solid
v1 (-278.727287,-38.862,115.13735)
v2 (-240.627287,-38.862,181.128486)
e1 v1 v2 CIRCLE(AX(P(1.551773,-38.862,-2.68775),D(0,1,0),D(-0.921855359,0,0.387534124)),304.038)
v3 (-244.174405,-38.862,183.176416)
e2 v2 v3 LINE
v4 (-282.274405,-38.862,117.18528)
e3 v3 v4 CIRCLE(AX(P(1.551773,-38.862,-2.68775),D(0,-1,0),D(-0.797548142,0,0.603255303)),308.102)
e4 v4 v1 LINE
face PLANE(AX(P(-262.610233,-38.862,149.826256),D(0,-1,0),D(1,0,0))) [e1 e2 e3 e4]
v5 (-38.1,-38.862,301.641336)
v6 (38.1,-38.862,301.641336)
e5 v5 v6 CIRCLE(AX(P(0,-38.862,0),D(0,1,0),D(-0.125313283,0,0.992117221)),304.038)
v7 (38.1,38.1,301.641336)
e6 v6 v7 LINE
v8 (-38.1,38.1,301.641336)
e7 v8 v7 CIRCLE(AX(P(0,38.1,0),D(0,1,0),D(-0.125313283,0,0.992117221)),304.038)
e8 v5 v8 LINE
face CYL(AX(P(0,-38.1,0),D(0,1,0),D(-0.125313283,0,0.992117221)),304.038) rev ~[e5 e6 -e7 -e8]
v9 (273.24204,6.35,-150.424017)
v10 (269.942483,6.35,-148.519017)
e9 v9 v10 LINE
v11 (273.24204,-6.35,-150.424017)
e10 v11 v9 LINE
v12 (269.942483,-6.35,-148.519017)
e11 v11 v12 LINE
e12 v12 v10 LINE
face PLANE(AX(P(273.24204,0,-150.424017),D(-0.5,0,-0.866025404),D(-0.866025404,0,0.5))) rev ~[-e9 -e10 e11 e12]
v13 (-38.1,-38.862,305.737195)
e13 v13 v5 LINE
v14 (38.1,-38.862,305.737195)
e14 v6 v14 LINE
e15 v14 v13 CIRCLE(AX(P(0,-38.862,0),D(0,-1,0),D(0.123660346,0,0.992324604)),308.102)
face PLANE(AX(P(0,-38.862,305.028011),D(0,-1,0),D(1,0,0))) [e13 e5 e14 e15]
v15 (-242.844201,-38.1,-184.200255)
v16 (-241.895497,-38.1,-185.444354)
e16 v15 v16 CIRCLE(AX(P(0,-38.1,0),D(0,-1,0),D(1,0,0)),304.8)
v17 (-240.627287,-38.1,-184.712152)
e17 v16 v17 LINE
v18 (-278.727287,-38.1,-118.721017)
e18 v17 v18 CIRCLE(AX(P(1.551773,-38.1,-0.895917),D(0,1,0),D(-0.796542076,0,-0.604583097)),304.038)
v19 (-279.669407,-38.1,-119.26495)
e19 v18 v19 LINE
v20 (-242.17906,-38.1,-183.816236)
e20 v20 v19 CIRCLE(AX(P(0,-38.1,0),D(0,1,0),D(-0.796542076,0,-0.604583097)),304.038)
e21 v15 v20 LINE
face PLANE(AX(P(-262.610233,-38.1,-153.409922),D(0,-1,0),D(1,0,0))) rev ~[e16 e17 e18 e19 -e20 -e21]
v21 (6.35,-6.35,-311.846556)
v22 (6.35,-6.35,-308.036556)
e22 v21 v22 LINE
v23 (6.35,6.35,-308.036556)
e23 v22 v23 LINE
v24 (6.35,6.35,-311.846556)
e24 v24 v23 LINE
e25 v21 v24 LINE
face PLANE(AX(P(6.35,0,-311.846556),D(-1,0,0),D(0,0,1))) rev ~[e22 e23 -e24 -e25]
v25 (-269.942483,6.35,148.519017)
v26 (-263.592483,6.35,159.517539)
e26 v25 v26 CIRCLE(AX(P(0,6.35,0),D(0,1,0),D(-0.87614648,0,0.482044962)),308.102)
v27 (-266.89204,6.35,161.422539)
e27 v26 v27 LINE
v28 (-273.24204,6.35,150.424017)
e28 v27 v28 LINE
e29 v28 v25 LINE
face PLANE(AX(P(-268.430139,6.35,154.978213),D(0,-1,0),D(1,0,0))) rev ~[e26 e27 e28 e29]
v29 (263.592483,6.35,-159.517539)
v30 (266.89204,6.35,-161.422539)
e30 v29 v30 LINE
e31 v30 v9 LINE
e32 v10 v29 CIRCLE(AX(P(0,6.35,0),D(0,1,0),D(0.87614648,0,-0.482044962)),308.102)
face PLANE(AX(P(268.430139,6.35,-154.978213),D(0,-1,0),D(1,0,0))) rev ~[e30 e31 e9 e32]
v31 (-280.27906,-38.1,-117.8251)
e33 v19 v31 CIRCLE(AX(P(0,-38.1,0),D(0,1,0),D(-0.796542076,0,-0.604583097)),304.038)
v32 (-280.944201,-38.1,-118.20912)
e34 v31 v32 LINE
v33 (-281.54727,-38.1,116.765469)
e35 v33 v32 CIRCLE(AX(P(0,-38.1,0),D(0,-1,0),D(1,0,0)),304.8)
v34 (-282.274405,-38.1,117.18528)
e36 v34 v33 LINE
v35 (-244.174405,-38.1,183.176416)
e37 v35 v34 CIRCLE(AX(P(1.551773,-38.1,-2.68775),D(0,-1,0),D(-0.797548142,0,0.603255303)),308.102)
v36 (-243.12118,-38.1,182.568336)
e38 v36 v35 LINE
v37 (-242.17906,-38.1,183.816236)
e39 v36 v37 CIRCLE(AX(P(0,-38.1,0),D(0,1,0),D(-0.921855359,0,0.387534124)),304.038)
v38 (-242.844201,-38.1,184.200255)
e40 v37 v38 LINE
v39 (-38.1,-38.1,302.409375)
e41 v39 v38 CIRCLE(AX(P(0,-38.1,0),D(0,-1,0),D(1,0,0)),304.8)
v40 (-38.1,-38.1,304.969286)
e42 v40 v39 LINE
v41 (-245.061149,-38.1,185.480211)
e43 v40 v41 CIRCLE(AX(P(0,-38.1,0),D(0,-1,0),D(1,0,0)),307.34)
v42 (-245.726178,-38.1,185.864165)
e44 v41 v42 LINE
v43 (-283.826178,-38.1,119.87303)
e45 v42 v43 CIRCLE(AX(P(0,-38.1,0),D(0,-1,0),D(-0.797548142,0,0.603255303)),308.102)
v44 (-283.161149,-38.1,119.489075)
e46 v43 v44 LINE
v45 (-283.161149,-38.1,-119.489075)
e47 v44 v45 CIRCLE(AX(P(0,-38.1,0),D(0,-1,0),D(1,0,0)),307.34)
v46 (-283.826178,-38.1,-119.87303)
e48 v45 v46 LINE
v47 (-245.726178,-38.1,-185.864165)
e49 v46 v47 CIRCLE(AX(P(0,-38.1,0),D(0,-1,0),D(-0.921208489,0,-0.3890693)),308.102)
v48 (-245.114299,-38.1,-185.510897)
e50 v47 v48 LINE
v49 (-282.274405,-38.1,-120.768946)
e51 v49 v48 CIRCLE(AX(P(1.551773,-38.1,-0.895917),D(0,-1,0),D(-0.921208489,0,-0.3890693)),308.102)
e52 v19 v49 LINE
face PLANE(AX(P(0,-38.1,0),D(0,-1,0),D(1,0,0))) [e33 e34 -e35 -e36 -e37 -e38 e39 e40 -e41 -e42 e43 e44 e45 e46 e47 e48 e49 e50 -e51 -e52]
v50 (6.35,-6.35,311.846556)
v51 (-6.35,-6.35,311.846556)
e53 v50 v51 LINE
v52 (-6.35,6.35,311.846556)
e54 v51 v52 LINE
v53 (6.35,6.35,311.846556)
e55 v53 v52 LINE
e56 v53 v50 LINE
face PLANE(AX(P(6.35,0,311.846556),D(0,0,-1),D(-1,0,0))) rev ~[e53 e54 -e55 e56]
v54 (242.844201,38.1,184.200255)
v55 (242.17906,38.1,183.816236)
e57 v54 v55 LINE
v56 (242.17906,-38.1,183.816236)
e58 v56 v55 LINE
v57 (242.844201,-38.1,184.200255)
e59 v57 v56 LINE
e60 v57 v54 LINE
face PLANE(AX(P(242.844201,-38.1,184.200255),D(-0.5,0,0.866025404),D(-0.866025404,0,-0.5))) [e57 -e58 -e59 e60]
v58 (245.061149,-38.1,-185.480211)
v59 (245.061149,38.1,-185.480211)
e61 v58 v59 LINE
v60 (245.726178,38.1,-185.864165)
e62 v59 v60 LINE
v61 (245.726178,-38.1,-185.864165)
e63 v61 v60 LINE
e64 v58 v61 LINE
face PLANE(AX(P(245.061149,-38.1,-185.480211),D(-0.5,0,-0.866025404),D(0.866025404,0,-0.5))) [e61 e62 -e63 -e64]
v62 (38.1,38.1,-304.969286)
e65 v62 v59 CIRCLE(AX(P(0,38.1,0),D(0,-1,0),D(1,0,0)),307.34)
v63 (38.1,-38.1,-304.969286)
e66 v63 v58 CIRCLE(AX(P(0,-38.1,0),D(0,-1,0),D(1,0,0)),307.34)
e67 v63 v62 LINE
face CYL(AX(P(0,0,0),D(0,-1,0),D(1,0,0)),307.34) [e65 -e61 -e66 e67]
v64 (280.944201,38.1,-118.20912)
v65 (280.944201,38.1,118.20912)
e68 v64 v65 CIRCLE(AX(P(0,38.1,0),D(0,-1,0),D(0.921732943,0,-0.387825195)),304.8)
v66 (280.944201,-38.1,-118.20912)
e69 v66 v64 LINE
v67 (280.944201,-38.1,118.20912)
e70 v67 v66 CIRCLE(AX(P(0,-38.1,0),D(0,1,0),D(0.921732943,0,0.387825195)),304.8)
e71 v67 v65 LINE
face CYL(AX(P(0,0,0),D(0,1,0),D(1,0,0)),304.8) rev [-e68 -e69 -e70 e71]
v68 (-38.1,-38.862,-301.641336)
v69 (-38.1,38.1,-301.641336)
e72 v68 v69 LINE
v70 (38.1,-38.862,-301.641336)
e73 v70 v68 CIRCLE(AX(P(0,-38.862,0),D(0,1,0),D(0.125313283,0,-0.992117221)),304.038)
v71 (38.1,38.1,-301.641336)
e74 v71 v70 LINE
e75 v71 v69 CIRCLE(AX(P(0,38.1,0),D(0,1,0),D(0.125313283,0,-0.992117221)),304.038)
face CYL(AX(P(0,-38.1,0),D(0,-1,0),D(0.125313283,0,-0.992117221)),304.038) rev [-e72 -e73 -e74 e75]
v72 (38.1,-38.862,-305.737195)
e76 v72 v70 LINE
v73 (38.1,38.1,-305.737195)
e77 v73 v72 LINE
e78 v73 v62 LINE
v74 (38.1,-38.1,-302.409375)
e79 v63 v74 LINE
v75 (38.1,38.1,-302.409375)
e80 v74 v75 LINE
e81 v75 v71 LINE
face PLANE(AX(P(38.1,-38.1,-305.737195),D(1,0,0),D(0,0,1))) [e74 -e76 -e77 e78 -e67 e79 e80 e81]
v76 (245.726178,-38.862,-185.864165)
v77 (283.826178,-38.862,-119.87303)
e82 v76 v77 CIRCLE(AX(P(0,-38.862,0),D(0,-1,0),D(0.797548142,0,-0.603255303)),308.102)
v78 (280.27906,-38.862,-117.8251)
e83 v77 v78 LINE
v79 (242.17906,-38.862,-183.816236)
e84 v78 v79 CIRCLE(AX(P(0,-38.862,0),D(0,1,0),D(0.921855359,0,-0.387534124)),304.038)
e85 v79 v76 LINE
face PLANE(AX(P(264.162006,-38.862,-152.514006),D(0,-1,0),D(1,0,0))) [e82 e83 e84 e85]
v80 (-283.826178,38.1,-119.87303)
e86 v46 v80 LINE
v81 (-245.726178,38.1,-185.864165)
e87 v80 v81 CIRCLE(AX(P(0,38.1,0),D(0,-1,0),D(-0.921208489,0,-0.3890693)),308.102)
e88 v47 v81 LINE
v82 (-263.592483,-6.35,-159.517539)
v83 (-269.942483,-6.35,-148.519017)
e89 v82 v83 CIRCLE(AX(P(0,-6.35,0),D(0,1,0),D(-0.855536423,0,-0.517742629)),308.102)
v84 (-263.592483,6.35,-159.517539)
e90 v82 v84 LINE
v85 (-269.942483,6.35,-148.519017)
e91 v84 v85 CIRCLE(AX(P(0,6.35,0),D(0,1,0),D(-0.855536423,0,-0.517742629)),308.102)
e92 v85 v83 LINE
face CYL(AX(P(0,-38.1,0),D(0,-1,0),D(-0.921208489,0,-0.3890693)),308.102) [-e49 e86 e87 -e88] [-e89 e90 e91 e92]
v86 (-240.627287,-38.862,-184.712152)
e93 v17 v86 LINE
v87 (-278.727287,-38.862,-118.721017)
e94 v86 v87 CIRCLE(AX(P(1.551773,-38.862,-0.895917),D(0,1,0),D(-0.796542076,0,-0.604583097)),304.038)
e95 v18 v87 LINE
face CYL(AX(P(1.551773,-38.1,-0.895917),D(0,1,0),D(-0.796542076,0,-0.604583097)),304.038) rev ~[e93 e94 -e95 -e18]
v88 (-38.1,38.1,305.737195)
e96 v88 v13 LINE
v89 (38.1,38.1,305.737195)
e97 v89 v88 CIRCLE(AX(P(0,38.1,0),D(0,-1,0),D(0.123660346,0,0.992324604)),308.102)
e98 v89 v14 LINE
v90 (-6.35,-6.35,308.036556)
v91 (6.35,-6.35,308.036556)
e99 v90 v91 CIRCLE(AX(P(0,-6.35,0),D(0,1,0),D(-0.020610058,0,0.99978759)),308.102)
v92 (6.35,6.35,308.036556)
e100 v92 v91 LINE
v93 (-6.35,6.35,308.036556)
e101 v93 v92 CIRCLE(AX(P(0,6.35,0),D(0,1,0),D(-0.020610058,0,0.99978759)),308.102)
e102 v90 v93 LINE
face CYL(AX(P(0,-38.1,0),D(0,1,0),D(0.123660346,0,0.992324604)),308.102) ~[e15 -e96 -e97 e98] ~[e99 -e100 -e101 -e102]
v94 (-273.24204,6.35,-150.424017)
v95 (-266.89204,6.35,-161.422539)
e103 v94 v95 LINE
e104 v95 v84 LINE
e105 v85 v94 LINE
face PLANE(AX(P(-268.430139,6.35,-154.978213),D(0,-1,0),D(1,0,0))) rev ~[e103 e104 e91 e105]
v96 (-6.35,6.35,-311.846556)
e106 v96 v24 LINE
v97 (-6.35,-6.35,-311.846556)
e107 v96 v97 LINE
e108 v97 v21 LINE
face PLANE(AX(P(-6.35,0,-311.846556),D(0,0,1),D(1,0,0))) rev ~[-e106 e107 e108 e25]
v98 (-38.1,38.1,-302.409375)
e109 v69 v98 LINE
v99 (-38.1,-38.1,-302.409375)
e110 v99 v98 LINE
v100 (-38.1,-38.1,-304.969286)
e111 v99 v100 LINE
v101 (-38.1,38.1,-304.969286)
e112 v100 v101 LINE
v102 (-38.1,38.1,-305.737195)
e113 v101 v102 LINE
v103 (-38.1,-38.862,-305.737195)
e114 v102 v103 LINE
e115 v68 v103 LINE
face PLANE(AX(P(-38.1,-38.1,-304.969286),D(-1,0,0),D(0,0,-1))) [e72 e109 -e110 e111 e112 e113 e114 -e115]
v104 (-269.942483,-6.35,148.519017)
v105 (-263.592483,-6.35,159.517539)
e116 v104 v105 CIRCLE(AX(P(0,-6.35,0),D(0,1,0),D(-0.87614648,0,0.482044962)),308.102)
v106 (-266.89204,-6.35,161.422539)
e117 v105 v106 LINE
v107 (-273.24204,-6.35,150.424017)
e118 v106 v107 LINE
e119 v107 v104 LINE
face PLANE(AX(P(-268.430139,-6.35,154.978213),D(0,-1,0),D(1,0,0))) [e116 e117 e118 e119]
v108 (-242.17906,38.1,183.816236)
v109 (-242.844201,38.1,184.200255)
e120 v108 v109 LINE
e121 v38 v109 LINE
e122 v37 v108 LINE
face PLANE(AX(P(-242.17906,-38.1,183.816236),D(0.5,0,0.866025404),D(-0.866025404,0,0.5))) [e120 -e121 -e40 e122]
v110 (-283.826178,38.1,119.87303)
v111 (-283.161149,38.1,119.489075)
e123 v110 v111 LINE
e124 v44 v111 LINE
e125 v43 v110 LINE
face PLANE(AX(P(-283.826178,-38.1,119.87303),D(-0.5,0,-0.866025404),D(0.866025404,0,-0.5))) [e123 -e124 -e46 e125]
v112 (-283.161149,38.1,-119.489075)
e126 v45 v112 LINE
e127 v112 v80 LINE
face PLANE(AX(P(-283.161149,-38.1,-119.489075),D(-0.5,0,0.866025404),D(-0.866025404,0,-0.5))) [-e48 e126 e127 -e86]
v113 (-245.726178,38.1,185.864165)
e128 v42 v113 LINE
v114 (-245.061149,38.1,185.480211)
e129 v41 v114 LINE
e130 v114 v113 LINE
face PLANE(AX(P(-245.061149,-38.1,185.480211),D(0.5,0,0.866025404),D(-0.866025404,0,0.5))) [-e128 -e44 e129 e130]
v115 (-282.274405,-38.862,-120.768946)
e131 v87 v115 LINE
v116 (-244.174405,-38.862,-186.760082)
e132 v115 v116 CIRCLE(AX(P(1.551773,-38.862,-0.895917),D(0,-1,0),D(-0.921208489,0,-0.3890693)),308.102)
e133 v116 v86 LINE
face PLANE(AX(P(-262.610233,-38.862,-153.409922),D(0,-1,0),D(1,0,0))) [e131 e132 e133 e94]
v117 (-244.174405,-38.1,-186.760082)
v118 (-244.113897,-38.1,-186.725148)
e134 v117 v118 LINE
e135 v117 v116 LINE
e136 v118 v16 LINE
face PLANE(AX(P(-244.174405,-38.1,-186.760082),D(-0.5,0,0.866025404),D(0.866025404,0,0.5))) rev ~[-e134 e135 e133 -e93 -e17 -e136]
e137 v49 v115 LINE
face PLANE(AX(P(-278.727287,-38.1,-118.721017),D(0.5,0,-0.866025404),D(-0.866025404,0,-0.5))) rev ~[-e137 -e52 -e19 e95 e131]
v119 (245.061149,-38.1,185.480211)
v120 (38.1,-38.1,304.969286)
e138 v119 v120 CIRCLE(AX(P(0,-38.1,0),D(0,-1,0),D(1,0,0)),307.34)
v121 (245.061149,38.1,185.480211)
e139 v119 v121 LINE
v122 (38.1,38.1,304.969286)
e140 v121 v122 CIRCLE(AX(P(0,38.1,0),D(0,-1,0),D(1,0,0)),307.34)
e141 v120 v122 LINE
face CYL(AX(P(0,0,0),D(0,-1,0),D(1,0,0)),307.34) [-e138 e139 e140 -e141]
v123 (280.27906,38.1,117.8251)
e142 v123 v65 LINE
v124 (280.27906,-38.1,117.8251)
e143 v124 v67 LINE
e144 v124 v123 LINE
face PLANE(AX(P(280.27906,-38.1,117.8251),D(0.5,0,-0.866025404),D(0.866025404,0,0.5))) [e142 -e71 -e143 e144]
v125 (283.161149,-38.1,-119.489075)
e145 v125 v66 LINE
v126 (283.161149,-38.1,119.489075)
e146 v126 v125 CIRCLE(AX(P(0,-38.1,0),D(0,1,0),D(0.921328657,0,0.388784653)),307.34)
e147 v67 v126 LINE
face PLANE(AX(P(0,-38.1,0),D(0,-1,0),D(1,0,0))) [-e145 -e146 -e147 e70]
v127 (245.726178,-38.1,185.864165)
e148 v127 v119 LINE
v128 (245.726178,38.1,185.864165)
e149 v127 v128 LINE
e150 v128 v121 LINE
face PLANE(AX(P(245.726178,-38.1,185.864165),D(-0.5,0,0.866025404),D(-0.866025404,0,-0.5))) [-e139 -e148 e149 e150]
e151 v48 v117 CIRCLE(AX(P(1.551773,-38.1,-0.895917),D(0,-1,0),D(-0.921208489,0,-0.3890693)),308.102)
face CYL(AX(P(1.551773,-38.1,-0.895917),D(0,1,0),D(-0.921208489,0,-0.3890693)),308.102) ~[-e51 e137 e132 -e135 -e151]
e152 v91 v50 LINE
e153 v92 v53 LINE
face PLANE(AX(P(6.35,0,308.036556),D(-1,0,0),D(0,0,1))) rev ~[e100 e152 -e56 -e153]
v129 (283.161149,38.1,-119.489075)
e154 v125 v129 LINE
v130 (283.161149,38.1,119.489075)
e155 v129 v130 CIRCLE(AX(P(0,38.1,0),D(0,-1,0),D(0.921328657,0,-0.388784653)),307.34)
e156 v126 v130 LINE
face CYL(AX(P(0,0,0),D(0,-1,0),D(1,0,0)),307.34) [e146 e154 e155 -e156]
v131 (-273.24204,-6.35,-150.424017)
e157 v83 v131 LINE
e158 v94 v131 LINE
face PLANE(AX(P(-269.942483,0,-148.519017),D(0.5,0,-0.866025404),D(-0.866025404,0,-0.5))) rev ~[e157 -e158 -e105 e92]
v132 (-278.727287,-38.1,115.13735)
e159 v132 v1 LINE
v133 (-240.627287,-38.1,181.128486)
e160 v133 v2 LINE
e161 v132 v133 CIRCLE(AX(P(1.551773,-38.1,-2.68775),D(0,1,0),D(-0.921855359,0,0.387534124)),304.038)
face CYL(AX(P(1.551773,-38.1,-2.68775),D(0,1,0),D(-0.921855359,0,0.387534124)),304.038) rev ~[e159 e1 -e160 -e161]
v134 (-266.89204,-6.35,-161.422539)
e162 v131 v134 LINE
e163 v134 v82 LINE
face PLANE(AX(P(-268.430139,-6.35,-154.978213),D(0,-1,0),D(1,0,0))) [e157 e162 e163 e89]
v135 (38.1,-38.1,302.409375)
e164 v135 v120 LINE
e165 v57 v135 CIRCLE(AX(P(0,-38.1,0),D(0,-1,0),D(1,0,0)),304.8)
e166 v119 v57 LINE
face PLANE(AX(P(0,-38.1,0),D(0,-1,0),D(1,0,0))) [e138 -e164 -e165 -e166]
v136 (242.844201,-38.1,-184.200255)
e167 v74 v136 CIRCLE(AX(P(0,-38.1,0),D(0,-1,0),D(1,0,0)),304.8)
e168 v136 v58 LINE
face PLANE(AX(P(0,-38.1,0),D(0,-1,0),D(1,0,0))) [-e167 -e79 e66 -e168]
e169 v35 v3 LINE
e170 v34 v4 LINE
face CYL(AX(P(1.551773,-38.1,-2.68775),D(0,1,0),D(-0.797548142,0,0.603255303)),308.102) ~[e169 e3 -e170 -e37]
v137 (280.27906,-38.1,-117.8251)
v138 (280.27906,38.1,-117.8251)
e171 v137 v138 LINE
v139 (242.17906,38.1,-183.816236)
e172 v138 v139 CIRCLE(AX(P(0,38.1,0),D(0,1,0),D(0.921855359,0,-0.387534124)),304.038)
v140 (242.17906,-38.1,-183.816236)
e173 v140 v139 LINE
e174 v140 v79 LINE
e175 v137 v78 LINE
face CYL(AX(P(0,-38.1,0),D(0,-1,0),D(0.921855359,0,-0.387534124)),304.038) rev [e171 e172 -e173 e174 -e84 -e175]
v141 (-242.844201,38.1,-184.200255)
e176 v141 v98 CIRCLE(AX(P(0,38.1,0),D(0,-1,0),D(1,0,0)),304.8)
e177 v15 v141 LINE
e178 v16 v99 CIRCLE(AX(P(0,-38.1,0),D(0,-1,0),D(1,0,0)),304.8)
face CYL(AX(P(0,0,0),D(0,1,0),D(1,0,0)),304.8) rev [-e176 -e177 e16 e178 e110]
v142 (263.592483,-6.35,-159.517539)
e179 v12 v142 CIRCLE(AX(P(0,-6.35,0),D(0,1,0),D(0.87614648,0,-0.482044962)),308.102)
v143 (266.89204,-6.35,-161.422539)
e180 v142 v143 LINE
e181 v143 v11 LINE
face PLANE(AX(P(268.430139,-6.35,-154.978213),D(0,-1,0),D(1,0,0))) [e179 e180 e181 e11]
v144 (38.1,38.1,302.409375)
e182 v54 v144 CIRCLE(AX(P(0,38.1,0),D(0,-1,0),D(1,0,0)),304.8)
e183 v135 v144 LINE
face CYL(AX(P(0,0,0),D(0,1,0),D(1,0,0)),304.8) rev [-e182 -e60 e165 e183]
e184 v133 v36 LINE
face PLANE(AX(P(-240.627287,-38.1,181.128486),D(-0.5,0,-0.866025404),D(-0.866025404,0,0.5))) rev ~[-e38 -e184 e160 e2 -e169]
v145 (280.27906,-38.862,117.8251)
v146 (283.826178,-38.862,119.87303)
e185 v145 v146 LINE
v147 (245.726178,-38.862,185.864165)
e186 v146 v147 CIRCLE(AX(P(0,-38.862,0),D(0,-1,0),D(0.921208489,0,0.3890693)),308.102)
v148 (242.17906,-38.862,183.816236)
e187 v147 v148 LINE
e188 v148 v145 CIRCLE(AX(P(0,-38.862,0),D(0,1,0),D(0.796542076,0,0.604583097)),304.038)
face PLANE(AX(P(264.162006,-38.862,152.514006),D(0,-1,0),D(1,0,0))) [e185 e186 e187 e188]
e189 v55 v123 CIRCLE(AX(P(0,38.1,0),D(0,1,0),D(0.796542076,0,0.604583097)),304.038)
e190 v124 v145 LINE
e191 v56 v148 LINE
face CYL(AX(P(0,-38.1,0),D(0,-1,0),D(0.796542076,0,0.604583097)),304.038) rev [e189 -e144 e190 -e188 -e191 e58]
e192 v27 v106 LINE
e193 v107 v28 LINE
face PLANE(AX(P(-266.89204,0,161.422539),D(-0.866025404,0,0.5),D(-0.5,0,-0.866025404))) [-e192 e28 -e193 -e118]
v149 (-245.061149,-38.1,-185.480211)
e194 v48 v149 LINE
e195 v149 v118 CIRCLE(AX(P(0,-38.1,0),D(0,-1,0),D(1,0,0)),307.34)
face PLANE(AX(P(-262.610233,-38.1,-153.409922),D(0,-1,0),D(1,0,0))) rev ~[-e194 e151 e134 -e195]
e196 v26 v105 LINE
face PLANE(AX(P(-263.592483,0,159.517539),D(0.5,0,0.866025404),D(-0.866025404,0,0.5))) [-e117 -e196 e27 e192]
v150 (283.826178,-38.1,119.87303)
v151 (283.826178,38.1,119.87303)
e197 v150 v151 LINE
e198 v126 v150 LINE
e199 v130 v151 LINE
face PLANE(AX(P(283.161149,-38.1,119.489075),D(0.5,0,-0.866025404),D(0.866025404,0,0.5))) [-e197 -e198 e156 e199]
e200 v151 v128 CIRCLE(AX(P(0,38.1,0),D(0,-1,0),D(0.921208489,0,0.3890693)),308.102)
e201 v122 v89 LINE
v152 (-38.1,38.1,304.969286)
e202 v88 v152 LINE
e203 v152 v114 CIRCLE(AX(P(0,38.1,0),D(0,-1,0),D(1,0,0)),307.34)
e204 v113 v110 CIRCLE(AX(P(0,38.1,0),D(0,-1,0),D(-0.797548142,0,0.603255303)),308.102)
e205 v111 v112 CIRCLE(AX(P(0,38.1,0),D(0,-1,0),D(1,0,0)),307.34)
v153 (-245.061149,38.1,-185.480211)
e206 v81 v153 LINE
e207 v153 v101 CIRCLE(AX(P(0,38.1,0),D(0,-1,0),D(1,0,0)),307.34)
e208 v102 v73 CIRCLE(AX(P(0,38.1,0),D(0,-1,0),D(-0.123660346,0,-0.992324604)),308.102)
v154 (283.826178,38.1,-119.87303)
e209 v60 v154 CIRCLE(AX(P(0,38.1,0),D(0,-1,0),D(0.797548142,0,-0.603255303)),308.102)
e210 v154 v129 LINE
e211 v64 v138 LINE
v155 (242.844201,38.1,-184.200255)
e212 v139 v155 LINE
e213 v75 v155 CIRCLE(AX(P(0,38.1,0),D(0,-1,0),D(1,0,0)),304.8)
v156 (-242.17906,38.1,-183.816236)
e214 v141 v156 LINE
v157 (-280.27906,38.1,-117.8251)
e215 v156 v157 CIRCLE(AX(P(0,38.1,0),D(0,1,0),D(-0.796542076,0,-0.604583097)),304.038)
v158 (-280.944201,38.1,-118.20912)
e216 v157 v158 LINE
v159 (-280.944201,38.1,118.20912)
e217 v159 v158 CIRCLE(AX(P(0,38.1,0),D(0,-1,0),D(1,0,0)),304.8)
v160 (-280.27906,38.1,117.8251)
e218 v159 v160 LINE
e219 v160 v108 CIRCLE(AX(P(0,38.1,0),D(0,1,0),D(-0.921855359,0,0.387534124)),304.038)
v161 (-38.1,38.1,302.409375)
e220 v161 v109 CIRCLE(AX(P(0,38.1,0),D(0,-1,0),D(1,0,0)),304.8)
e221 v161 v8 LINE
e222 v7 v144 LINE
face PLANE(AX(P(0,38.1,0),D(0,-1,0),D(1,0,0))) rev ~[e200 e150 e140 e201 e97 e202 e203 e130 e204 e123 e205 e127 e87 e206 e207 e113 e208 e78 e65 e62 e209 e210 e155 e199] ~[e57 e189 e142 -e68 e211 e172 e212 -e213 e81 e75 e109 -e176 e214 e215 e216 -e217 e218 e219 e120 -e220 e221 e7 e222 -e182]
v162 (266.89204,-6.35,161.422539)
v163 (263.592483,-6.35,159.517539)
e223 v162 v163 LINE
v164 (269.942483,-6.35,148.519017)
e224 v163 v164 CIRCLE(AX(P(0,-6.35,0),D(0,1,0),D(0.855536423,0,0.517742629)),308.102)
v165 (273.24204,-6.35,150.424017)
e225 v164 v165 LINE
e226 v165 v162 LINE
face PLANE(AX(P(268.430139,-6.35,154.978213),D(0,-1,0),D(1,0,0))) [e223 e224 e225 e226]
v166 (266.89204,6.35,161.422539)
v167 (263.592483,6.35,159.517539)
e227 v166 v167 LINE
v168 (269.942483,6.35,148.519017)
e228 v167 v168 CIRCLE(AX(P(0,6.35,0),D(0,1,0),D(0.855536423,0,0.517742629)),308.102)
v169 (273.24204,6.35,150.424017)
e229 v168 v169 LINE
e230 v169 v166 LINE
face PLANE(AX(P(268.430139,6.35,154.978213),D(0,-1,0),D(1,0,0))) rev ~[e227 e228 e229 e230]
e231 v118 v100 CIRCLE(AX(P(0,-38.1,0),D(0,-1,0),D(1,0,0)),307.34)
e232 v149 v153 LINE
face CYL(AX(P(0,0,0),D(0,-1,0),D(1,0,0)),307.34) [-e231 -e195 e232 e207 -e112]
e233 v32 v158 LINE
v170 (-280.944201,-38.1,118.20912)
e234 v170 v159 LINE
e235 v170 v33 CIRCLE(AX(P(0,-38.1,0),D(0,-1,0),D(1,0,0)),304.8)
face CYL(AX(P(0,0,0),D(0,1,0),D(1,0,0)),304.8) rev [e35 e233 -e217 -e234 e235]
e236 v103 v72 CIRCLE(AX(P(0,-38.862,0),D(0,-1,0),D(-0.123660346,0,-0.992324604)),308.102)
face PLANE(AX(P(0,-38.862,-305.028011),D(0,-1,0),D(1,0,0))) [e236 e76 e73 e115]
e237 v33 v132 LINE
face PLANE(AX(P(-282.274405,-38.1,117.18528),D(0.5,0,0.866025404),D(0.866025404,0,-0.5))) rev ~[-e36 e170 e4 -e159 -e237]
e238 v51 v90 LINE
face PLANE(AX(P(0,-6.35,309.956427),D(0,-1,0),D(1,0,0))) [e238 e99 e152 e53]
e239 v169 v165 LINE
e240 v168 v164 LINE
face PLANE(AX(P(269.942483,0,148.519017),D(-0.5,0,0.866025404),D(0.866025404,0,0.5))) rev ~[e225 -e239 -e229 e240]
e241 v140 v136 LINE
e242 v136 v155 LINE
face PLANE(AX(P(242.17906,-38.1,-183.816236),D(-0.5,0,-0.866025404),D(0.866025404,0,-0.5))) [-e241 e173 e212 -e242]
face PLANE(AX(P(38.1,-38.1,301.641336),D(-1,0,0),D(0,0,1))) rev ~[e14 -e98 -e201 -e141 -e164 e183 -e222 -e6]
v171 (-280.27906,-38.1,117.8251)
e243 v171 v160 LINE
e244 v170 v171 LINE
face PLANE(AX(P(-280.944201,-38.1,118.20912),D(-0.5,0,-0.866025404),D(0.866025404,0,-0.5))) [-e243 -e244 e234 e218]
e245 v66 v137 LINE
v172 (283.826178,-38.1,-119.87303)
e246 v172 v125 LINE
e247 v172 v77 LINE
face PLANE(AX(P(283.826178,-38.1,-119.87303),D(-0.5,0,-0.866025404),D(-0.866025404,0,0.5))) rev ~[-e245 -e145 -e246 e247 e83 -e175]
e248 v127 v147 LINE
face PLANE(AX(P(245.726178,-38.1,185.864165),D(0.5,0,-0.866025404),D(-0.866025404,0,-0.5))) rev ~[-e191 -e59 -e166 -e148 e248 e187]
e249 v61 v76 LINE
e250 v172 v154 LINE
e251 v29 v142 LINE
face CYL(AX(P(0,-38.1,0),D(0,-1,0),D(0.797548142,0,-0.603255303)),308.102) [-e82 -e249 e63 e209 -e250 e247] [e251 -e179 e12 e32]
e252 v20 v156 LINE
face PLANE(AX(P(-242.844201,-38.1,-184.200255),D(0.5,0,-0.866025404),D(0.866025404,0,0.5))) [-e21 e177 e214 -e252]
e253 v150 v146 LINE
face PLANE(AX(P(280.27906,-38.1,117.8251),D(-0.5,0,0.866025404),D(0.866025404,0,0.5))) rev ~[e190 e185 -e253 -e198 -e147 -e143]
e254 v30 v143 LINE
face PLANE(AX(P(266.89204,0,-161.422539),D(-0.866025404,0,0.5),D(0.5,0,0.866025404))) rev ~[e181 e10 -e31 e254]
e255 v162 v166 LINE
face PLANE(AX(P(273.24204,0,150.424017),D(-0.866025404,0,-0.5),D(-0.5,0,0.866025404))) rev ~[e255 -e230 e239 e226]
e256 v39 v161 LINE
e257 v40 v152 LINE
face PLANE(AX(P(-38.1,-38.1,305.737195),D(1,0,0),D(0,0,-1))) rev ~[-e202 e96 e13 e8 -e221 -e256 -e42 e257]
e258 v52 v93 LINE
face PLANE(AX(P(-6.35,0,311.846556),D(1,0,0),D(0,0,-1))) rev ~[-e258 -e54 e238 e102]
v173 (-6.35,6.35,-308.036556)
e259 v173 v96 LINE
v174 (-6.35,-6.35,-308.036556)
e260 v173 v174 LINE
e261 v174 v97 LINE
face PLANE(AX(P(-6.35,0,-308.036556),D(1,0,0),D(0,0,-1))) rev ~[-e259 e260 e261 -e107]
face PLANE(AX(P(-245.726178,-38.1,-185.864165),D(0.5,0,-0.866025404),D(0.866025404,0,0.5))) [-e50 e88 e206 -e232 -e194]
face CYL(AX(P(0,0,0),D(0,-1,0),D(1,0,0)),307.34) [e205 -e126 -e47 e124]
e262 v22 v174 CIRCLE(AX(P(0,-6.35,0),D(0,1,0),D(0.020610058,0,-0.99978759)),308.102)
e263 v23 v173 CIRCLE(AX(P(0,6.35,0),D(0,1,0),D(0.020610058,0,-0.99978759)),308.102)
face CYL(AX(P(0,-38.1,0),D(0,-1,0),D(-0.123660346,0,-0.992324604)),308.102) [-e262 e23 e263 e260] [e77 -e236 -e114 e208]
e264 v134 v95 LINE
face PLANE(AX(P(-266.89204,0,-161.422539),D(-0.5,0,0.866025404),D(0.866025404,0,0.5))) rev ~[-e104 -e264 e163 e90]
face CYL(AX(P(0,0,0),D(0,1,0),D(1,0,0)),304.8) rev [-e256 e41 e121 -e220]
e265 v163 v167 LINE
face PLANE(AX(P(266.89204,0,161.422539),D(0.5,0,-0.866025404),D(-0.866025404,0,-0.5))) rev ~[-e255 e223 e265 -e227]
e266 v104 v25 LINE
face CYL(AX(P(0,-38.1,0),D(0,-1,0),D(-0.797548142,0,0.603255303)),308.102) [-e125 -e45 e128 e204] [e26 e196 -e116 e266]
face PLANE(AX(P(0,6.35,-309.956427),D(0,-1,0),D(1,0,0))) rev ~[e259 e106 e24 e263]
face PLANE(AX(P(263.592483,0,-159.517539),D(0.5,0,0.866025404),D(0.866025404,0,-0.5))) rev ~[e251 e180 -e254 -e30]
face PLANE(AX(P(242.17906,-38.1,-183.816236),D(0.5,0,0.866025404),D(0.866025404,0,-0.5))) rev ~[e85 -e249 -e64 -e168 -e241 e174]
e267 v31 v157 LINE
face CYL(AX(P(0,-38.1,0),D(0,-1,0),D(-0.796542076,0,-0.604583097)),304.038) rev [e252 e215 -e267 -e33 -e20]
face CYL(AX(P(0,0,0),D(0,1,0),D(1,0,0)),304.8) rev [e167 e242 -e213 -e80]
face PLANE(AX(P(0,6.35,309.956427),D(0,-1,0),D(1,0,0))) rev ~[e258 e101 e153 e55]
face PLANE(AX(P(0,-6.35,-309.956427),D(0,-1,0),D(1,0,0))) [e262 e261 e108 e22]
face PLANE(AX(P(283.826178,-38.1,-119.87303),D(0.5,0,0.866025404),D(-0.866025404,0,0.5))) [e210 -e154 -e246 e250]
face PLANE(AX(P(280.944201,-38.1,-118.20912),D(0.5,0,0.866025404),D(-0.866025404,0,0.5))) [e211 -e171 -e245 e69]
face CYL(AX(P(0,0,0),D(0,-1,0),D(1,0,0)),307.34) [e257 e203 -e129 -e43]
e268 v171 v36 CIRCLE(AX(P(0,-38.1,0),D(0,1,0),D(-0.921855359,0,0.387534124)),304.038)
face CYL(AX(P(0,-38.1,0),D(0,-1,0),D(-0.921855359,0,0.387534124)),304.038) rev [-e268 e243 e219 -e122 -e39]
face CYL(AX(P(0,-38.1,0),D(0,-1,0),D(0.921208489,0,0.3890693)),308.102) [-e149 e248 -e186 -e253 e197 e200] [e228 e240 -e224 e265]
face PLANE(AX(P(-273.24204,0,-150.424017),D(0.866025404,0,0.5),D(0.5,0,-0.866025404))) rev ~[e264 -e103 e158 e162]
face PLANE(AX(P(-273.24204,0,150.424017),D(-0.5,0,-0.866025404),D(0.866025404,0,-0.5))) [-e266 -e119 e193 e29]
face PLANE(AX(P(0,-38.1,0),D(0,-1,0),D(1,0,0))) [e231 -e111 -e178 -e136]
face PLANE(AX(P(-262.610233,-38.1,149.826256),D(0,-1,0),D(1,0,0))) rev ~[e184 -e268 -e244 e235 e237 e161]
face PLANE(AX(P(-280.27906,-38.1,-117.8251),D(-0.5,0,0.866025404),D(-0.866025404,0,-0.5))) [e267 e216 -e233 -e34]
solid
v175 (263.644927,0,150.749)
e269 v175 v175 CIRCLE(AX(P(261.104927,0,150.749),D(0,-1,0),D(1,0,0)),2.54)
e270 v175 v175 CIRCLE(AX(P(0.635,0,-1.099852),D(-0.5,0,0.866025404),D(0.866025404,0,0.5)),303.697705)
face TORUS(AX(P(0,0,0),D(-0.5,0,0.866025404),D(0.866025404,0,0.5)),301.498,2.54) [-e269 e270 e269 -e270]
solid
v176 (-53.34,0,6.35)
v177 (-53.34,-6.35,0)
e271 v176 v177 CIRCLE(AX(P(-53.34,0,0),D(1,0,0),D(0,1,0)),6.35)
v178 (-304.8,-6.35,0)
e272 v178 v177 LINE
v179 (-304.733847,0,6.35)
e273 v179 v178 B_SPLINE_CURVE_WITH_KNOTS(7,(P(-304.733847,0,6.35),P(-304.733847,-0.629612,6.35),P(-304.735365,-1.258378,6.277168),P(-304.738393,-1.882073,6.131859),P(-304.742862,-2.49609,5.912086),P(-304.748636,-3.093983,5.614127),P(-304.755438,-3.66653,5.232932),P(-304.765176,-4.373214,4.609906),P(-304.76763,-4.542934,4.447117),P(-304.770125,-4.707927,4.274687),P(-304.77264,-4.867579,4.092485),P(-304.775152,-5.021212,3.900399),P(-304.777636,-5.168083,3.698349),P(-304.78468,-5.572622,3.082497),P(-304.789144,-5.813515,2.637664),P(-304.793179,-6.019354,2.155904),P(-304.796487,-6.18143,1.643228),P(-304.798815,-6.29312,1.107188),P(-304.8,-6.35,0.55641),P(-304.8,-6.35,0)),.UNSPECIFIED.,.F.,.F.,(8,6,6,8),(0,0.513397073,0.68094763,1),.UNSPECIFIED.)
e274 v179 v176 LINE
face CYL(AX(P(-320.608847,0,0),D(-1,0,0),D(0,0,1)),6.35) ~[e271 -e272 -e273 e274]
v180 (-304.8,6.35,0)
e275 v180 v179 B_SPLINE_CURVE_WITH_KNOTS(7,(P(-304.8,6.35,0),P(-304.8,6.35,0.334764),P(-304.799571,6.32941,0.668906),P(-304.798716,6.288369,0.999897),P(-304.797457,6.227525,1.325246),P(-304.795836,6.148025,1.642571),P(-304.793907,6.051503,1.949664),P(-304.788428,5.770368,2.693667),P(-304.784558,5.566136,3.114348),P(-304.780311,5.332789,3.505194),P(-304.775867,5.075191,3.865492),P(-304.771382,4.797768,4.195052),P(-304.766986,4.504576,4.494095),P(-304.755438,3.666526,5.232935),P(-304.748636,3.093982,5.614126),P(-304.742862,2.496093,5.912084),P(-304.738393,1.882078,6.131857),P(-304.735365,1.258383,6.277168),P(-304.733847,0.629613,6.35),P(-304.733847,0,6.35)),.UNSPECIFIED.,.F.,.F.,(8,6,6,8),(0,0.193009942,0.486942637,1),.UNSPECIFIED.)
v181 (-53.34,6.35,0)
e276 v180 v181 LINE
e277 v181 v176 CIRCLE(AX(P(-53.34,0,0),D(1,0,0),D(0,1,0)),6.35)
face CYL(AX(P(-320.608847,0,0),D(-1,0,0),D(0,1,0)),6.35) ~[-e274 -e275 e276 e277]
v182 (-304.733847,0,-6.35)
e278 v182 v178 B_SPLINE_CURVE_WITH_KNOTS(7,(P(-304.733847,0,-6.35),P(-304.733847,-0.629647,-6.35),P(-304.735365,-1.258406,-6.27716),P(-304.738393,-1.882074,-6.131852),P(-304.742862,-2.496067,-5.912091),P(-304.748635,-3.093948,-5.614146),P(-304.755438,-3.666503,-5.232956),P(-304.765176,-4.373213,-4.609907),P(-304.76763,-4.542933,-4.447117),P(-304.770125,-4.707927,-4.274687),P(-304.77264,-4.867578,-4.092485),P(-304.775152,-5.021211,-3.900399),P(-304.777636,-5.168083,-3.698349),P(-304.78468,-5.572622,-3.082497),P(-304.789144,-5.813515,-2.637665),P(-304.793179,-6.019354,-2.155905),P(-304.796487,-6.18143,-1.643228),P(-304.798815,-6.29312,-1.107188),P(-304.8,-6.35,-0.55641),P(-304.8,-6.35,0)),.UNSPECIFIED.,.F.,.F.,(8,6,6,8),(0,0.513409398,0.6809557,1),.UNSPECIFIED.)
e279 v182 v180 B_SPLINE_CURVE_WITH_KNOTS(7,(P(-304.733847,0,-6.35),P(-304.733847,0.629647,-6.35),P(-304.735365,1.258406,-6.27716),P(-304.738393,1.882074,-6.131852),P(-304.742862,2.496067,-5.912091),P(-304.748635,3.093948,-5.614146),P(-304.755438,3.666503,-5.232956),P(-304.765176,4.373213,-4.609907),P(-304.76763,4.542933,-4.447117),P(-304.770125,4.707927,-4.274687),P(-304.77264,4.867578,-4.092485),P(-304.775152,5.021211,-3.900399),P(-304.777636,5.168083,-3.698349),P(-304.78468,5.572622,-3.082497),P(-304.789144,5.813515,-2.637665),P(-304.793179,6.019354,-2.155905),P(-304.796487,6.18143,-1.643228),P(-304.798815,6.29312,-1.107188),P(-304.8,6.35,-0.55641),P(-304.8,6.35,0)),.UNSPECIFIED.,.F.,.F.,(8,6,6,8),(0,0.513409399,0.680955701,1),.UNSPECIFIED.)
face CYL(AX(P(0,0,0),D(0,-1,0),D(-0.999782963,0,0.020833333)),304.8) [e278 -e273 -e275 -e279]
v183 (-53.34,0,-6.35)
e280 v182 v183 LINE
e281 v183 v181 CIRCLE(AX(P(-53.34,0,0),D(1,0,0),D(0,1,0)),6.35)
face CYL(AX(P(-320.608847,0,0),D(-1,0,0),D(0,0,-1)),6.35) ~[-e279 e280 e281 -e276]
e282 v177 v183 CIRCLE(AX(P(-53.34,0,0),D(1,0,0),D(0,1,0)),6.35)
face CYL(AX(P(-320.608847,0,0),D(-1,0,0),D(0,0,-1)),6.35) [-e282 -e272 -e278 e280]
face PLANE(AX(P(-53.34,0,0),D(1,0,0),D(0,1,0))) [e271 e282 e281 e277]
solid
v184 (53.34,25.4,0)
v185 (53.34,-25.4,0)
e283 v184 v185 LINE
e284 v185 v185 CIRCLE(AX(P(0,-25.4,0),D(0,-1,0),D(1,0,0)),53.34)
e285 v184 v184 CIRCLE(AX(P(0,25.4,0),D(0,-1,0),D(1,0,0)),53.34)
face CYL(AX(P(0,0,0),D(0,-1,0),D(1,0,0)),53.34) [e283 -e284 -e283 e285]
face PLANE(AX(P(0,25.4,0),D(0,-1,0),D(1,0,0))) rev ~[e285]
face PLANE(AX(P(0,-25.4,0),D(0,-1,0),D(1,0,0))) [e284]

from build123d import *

# Parameters (mm, degrees)
F0_R         = 307.34
F0_R_2       = 304.8
F1_DEPTH     = 38.1
F3_DEPTH     = 76.2
F5_DEPTH     = 0.762
F7_DEPTH     = 6.35
F8_R         = 2.54
F11_DEPTH    = 6.35
F12_T1_DEPTH = 336.4838469878
F12_T3_DEPTH = 336.4838469878
F12_T5_DEPTH = 336.4838469894
F12_T7_DEPTH = 336.4838469894
F13_R        = 6.35
F14_DEPTH    = 53.34
F15_R        = 53.34
F16_DEPTH    = 25.4


# Not quite as in the source:
# - a fillet or chamfer that OpenCascade refuses, or shapes differently, is made with other operations: its cross-section is extruded or revolved along the edge and cut away or added


with BuildPart() as f1:
    # F0 (on Front) → F1 (new body, symmetric)
    with BuildSketch(Plane.XZ):
        Circle(F0_R)
        Circle(F0_R_2, mode=Mode.SUBTRACT)
    extrude(amount=F1_DEPTH, both=True)

    # F2 (on face) → F3 (join, through all)
    with BuildSketch(Plane.XZ.offset(38.1)):
        with BuildLine():
            ThreePointArc((-38.1, 304.9692863224), (0, 307.34), (38.1, 304.9692863224))
            Line((38.1, 304.9692863224), (38.1, 305.737194996))
            ThreePointArc((38.1, 305.737194996), (0, 308.102), (-38.1, 305.737194996))
            Line((-38.1, 305.737194996), (-38.1, 304.9692863224))
        make_face()
        with BuildLine():
            Line((38.1, 301.6413357682), (38.1, 302.4093748547))
            ThreePointArc((38.1, 302.4093748547), (0, 304.8), (-38.1, 302.4093748547))
            Line((-38.1, 302.4093748547), (-38.1, 301.6413357682))
            ThreePointArc((-38.1, 301.6413357682), (0, 304.038), (38.1, 301.6413357682))
        make_face()
        with BuildLine():
            Line((280.2790596067, 117.8250999999), (280.9442009667, 118.2091195432))
            ThreePointArc((280.9442009667, 118.2091195432), (263.9645430735, 152.4), (242.8442009667, 184.2002553115))
            Line((242.8442009667, 184.2002553115), (242.1790596067, 183.8162357683))
            ThreePointArc((242.1790596067, 183.8162357683), (263.3046317158, 152.019), (280.2790596067, 117.8250999999))
        make_face()
        with BuildLine():
            Line((283.1611493292, 119.489075277), (283.8261777483, 119.8730296138))
            ThreePointArc((283.8261777483, 119.8730296138), (266.8241589568, 154.051), (245.7261777483, 185.8641653822))
            Line((245.7261777483, 185.8641653822), (245.0611493292, 185.4802110454))
            ThreePointArc((245.0611493292, 185.4802110454), (266.1642475991, 153.67), (283.1611493292, 119.489075277))
        make_face()
        with BuildLine():
            Line((242.1790596067, -183.8162357683), (242.8442009667, -184.2002553115))
            ThreePointArc((242.8442009667, -184.2002553115), (263.9645430735, -152.4), (280.9442009667, -118.2091195432))
            Line((280.9442009667, -118.2091195432), (280.2790596067, -117.8250999999))
            ThreePointArc((280.2790596067, -117.8250999999), (263.3046317158, -152.019), (242.1790596067, -183.8162357683))
        make_face()
        with BuildLine():
            Line((245.0611493292, -185.4802110454), (245.7261777483, -185.8641653822))
            ThreePointArc((245.7261777483, -185.8641653822), (266.8241589568, -154.051), (283.8261777483, -119.8730296138))
            Line((283.8261777483, -119.8730296138), (283.1611493292, -119.489075277))
            ThreePointArc((283.1611493292, -119.489075277), (266.1642475991, -153.67), (245.0611493292, -185.4802110454))
        make_face()
        with BuildLine():
            Line((-38.1, -301.6413357682), (-38.1, -302.4093748547))
            ThreePointArc((-38.1, -302.4093748547), (0, -304.8), (38.1, -302.4093748547))
            Line((38.1, -302.4093748547), (38.1, -301.6413357682))
            ThreePointArc((38.1, -301.6413357682), (0, -304.038), (-38.1, -301.6413357682))
        make_face()
        with BuildLine():
            Line((-38.1, -304.9692863224), (-38.1, -305.737194996))
            ThreePointArc((-38.1, -305.737194996), (0, -308.102), (38.1, -305.737194996))
            Line((38.1, -305.737194996), (38.1, -304.9692863224))
            ThreePointArc((38.1, -304.9692863224), (0, -307.34), (-38.1, -304.9692863224))
        make_face()
        with BuildLine():
            Line((-280.2790596067, -117.8250999999), (-280.9442009667, -118.2091195432))
            ThreePointArc((-280.9442009667, -118.2091195432), (-263.9645430735, -152.4), (-242.8442009667, -184.2002553115))
            Line((-242.8442009667, -184.2002553115), (-242.1790596067, -183.8162357683))
            ThreePointArc((-242.1790596067, -183.8162357683), (-263.3046317158, -152.019), (-280.2790596067, -117.8250999999))
        make_face()
        with BuildLine():
            Line((-283.1611493292, -119.489075277), (-283.8261777483, -119.8730296138))
            ThreePointArc((-283.8261777483, -119.8730296138), (-266.8241589568, -154.051), (-245.7261777483, -185.8641653822))
            Line((-245.7261777483, -185.8641653822), (-245.0611493292, -185.4802110454))
            ThreePointArc((-245.0611493292, -185.4802110454), (-266.1642475991, -153.67), (-283.1611493292, -119.489075277))
        make_face()
        with BuildLine():
            Line((-242.1790596067, 183.8162357683), (-242.8442009667, 184.2002553115))
            ThreePointArc((-242.8442009667, 184.2002553115), (-263.9645430735, 152.4), (-280.9442009667, 118.2091195432))
            Line((-280.9442009667, 118.2091195432), (-280.2790596067, 117.8250999999))
            ThreePointArc((-280.2790596067, 117.8250999999), (-263.3046317158, 152.019), (-242.1790596067, 183.8162357683))
        make_face()
        with BuildLine():
            Line((-245.0611493292, 185.4802110454), (-245.7261777483, 185.8641653822))
            ThreePointArc((-245.7261777483, 185.8641653822), (-266.8241589568, 154.051), (-283.8261777483, 119.8730296138))
            Line((-283.8261777483, 119.8730296138), (-283.1611493292, 119.489075277))
            ThreePointArc((-283.1611493292, 119.489075277), (-266.1642475991, 153.67), (-245.0611493292, 185.4802110454))
        make_face()
    extrude(amount=-F3_DEPTH)

    # F4 (on face) → F5 (join)
    with BuildSketch(Plane.XZ.offset(38.1)):
        with BuildLine():
            Line((38.1, 301.6413357682), (38.1, 305.737194996))
            ThreePointArc((38.1, 305.737194996), (0, 308.102), (-38.1, 305.737194996))
            Line((-38.1, 305.737194996), (-38.1, 301.6413357682))
            ThreePointArc((-38.1, 301.6413357682), (0, 304.038), (38.1, 301.6413357682))
        make_face()
        with BuildLine():
            ThreePointArc((242.1790596067, 183.8162357683), (263.3046317158, 152.019), (280.2790596067, 117.8250999999))
            Line((280.2790596067, 117.8250999999), (283.8261777483, 119.8730296138))
            ThreePointArc((283.8261777483, 119.8730296138), (266.8241589568, 154.051), (245.7261777483, 185.8641653822))
            Line((245.7261777483, 185.8641653822), (242.1790596067, 183.8162357683))
        make_face()
        with BuildLine():
            ThreePointArc((280.2790596067, -117.8250999999), (263.3046317158, -152.019), (242.1790596067, -183.8162357683))
            Line((242.1790596067, -183.8162357683), (245.7261777483, -185.8641653822))
            ThreePointArc((245.7261777483, -185.8641653822), (266.8241589568, -154.051), (283.8261777483, -119.8730296138))
            Line((283.8261777483, -119.8730296138), (280.2790596067, -117.8250999999))
        make_face()
        with BuildLine():
            ThreePointArc((38.1, -301.6413357682), (0, -304.038), (-38.1, -301.6413357682))
            Line((-38.1, -301.6413357682), (-38.1, -305.737194996))
            ThreePointArc((-38.1, -305.737194996), (0, -308.102), (38.1, -305.737194996))
            Line((38.1, -305.737194996), (38.1, -301.6413357682))
        make_face()
        with BuildLine():
            ThreePointArc((-240.6272865628, -184.7121523529), (-261.7528586719, -152.9149165846), (-278.7272865628, -118.7210165845))
            Line((-278.7272865628, -118.7210165845), (-282.2744047044, -120.7689461984))
            ThreePointArc((-282.2744047044, -120.7689461984), (-265.2723859129, -154.9469165846), (-244.1744047044, -186.7600819668))
            Line((-244.1744047044, -186.7600819668), (-240.6272865628, -184.7121523529))
        make_face()
        with BuildLine():
            ThreePointArc((-278.7272865628, 115.1373502461), (-261.7528586719, 149.3312502462), (-240.6272865628, 181.1284860145))
            Line((-240.6272865628, 181.1284860145), (-244.1744047044, 183.1764156284))
            ThreePointArc((-244.1744047044, 183.1764156284), (-265.2723859129, 151.3632502462), (-282.2744047044, 117.18527986))
            Line((-282.2744047044, 117.18527986), (-278.7272865628, 115.1373502461))
        make_face()
    extrude(amount=F5_DEPTH)

    # F6 (on Front) → F7 (join, symmetric)
    with BuildSketch(Plane.XZ):
        with BuildLine():
            ThreePointArc((-6.35, 308.0365561163), (0, 308.102), (6.35, 308.0365561163))
            Line((6.35, 308.0365561163), (6.35, 311.8465561163))
            Line((6.35, 311.8465561163), (-6.35, 311.8465561163))
            Line((-6.35, 311.8465561163), (-6.35, 308.0365561163))
        make_face()
        with BuildLine():
            ThreePointArc((263.592482891, 159.5175393722), (266.8241589568, 154.051), (269.942482891, 148.5190167441))
            Line((269.942482891, 148.5190167441), (273.2420396794, 150.4240167441))
            Line((273.2420396794, 150.4240167441), (266.8920396794, 161.4225393722))
            Line((266.8920396794, 161.4225393722), (263.592482891, 159.5175393722))
        make_face()
        with BuildLine():
            ThreePointArc((269.942482891, -148.5190167441), (266.8241589568, -154.051), (263.592482891, -159.5175393722))
            Line((263.592482891, -159.5175393722), (266.8920396794, -161.4225393722))
            Line((266.8920396794, -161.4225393722), (273.2420396794, -150.4240167441))
            Line((273.2420396794, -150.4240167441), (269.942482891, -148.5190167441))
        make_face()
        with BuildLine():
            ThreePointArc((6.35, -308.0365561163), (0, -308.102), (-6.35, -308.0365561163))
            Line((-6.35, -308.0365561163), (-6.35, -311.8465561163))
            Line((-6.35, -311.8465561163), (6.35, -311.8465561163))
            Line((6.35, -311.8465561163), (6.35, -308.0365561163))
        make_face()
        with BuildLine():
            ThreePointArc((-263.592482891, -159.5175393722), (-266.8241589568, -154.051), (-269.942482891, -148.5190167441))
            Line((-269.942482891, -148.5190167441), (-273.2420396794, -150.4240167441))
            Line((-273.2420396794, -150.4240167441), (-266.8920396794, -161.4225393722))
            Line((-266.8920396794, -161.4225393722), (-263.592482891, -159.5175393722))
        make_face()
        with BuildLine():
            ThreePointArc((-269.942482891, 148.5190167441), (-266.8241589568, 154.051), (-263.592482891, 159.5175393722))
            Line((-263.592482891, 159.5175393722), (-266.8920396794, 161.4225393722))
            Line((-266.8920396794, 161.4225393722), (-273.2420396794, 150.4240167441))
            Line((-273.2420396794, 150.4240167441), (-269.942482891, 148.5190167441))
        make_face()
    extrude(amount=F7_DEPTH, both=True)


with BuildPart() as f9:
    # F8 (on Front) → F9 (revolve)
    with BuildSketch(Plane.XZ):
        with Locations((261.1049271902, 150.749)):
            Circle(F8_R)
    revolve(axis=Axis((-61.2589323324, 0, 106.1035832171), (-0.5, 0, 0.8660254038)))


with BuildPart() as f11:
    # F10 (on Front) → F11 (new body, symmetric)
    with BuildSketch(Plane.XZ):
        with BuildLine():
            Line((0, 6.3499999233), (-304.7338469894, 6.3499999233))
            ThreePointArc((-304.7338469894, 6.3499999233), (-304.8, -3.84e-08), (-304.7338469878, -6.35))
            Line((-304.7338469878, -6.35), (0, -6.35))
            Line((0, -6.35), (0, 6.3499999233))
        make_face()
    extrude(amount=F11_DEPTH, both=True)

    # F12: fillet of radius 6.35 on 4 edges, made by hand

    # F12_s2 → F12_t1 (cut)
    with BuildSketch(Plane.YZ.offset(-320.6088469878)):
        with BuildLine():
            ThreePointArc((0, -6.35), (4.4901280605, -4.4901280605), (6.35, 0))
            Line((6.35, 0), (6.35, -6.35))
            Line((6.35, -6.35), (0, -6.35))
        make_face()
    extrude(amount=F12_T1_DEPTH, mode=Mode.SUBTRACT)

    # F12_s4 → F12_t3 (cut)
    with BuildSketch(Plane.YZ.offset(-320.6088469878)):
        with BuildLine():
            ThreePointArc((0, -6.35), (-4.4901280605, -4.4901280605), (-6.35, 0))
            Line((-6.35, 0), (-6.35, -6.35))
            Line((-6.35, -6.35), (0, -6.35))
        make_face()
    extrude(amount=F12_T3_DEPTH, mode=Mode.SUBTRACT)

    # F12_s6 → F12_t5 (cut)
    with BuildSketch(Plane.YZ.offset(-320.6088469894)):
        with BuildLine():
            ThreePointArc((6.35, -7.67e-08), (4.4901280605, 4.4901279838), (0, 6.3499999233))
            Line((0, 6.3499999233), (6.35, 6.3499999233))
            Line((6.35, 6.3499999233), (6.35, -7.67e-08))
        make_face()
    extrude(amount=F12_T5_DEPTH, mode=Mode.SUBTRACT)

    # F12_s8 → F12_t7 (cut)
    with BuildSketch(Plane.YZ.offset(-320.6088469894)):
        with BuildLine():
            ThreePointArc((0, 6.3499999233), (-4.4901280605, 4.4901279838), (-6.35, -7.67e-08))
            Line((-6.35, -7.67e-08), (-6.35, 6.3499999233))
            Line((-6.35, 6.3499999233), (0, 6.3499999233))
        make_face()
    extrude(amount=F12_T7_DEPTH, mode=Mode.SUBTRACT)

    # F13 (on face) → F14 (cut)
    with BuildSketch(Plane.YZ):
        with Locations((0, -7.67e-08)):
            Circle(F13_R)
    extrude(amount=-F14_DEPTH, mode=Mode.SUBTRACT)


with BuildPart() as f16:
    # F15 (on Front) → F16 (new body, symmetric)
    with BuildSketch(Plane.XZ):
        Circle(F15_R)
    extrude(amount=F16_DEPTH, both=True)


solid = Compound([f1.part, f9.part, f11.part, f16.part])
